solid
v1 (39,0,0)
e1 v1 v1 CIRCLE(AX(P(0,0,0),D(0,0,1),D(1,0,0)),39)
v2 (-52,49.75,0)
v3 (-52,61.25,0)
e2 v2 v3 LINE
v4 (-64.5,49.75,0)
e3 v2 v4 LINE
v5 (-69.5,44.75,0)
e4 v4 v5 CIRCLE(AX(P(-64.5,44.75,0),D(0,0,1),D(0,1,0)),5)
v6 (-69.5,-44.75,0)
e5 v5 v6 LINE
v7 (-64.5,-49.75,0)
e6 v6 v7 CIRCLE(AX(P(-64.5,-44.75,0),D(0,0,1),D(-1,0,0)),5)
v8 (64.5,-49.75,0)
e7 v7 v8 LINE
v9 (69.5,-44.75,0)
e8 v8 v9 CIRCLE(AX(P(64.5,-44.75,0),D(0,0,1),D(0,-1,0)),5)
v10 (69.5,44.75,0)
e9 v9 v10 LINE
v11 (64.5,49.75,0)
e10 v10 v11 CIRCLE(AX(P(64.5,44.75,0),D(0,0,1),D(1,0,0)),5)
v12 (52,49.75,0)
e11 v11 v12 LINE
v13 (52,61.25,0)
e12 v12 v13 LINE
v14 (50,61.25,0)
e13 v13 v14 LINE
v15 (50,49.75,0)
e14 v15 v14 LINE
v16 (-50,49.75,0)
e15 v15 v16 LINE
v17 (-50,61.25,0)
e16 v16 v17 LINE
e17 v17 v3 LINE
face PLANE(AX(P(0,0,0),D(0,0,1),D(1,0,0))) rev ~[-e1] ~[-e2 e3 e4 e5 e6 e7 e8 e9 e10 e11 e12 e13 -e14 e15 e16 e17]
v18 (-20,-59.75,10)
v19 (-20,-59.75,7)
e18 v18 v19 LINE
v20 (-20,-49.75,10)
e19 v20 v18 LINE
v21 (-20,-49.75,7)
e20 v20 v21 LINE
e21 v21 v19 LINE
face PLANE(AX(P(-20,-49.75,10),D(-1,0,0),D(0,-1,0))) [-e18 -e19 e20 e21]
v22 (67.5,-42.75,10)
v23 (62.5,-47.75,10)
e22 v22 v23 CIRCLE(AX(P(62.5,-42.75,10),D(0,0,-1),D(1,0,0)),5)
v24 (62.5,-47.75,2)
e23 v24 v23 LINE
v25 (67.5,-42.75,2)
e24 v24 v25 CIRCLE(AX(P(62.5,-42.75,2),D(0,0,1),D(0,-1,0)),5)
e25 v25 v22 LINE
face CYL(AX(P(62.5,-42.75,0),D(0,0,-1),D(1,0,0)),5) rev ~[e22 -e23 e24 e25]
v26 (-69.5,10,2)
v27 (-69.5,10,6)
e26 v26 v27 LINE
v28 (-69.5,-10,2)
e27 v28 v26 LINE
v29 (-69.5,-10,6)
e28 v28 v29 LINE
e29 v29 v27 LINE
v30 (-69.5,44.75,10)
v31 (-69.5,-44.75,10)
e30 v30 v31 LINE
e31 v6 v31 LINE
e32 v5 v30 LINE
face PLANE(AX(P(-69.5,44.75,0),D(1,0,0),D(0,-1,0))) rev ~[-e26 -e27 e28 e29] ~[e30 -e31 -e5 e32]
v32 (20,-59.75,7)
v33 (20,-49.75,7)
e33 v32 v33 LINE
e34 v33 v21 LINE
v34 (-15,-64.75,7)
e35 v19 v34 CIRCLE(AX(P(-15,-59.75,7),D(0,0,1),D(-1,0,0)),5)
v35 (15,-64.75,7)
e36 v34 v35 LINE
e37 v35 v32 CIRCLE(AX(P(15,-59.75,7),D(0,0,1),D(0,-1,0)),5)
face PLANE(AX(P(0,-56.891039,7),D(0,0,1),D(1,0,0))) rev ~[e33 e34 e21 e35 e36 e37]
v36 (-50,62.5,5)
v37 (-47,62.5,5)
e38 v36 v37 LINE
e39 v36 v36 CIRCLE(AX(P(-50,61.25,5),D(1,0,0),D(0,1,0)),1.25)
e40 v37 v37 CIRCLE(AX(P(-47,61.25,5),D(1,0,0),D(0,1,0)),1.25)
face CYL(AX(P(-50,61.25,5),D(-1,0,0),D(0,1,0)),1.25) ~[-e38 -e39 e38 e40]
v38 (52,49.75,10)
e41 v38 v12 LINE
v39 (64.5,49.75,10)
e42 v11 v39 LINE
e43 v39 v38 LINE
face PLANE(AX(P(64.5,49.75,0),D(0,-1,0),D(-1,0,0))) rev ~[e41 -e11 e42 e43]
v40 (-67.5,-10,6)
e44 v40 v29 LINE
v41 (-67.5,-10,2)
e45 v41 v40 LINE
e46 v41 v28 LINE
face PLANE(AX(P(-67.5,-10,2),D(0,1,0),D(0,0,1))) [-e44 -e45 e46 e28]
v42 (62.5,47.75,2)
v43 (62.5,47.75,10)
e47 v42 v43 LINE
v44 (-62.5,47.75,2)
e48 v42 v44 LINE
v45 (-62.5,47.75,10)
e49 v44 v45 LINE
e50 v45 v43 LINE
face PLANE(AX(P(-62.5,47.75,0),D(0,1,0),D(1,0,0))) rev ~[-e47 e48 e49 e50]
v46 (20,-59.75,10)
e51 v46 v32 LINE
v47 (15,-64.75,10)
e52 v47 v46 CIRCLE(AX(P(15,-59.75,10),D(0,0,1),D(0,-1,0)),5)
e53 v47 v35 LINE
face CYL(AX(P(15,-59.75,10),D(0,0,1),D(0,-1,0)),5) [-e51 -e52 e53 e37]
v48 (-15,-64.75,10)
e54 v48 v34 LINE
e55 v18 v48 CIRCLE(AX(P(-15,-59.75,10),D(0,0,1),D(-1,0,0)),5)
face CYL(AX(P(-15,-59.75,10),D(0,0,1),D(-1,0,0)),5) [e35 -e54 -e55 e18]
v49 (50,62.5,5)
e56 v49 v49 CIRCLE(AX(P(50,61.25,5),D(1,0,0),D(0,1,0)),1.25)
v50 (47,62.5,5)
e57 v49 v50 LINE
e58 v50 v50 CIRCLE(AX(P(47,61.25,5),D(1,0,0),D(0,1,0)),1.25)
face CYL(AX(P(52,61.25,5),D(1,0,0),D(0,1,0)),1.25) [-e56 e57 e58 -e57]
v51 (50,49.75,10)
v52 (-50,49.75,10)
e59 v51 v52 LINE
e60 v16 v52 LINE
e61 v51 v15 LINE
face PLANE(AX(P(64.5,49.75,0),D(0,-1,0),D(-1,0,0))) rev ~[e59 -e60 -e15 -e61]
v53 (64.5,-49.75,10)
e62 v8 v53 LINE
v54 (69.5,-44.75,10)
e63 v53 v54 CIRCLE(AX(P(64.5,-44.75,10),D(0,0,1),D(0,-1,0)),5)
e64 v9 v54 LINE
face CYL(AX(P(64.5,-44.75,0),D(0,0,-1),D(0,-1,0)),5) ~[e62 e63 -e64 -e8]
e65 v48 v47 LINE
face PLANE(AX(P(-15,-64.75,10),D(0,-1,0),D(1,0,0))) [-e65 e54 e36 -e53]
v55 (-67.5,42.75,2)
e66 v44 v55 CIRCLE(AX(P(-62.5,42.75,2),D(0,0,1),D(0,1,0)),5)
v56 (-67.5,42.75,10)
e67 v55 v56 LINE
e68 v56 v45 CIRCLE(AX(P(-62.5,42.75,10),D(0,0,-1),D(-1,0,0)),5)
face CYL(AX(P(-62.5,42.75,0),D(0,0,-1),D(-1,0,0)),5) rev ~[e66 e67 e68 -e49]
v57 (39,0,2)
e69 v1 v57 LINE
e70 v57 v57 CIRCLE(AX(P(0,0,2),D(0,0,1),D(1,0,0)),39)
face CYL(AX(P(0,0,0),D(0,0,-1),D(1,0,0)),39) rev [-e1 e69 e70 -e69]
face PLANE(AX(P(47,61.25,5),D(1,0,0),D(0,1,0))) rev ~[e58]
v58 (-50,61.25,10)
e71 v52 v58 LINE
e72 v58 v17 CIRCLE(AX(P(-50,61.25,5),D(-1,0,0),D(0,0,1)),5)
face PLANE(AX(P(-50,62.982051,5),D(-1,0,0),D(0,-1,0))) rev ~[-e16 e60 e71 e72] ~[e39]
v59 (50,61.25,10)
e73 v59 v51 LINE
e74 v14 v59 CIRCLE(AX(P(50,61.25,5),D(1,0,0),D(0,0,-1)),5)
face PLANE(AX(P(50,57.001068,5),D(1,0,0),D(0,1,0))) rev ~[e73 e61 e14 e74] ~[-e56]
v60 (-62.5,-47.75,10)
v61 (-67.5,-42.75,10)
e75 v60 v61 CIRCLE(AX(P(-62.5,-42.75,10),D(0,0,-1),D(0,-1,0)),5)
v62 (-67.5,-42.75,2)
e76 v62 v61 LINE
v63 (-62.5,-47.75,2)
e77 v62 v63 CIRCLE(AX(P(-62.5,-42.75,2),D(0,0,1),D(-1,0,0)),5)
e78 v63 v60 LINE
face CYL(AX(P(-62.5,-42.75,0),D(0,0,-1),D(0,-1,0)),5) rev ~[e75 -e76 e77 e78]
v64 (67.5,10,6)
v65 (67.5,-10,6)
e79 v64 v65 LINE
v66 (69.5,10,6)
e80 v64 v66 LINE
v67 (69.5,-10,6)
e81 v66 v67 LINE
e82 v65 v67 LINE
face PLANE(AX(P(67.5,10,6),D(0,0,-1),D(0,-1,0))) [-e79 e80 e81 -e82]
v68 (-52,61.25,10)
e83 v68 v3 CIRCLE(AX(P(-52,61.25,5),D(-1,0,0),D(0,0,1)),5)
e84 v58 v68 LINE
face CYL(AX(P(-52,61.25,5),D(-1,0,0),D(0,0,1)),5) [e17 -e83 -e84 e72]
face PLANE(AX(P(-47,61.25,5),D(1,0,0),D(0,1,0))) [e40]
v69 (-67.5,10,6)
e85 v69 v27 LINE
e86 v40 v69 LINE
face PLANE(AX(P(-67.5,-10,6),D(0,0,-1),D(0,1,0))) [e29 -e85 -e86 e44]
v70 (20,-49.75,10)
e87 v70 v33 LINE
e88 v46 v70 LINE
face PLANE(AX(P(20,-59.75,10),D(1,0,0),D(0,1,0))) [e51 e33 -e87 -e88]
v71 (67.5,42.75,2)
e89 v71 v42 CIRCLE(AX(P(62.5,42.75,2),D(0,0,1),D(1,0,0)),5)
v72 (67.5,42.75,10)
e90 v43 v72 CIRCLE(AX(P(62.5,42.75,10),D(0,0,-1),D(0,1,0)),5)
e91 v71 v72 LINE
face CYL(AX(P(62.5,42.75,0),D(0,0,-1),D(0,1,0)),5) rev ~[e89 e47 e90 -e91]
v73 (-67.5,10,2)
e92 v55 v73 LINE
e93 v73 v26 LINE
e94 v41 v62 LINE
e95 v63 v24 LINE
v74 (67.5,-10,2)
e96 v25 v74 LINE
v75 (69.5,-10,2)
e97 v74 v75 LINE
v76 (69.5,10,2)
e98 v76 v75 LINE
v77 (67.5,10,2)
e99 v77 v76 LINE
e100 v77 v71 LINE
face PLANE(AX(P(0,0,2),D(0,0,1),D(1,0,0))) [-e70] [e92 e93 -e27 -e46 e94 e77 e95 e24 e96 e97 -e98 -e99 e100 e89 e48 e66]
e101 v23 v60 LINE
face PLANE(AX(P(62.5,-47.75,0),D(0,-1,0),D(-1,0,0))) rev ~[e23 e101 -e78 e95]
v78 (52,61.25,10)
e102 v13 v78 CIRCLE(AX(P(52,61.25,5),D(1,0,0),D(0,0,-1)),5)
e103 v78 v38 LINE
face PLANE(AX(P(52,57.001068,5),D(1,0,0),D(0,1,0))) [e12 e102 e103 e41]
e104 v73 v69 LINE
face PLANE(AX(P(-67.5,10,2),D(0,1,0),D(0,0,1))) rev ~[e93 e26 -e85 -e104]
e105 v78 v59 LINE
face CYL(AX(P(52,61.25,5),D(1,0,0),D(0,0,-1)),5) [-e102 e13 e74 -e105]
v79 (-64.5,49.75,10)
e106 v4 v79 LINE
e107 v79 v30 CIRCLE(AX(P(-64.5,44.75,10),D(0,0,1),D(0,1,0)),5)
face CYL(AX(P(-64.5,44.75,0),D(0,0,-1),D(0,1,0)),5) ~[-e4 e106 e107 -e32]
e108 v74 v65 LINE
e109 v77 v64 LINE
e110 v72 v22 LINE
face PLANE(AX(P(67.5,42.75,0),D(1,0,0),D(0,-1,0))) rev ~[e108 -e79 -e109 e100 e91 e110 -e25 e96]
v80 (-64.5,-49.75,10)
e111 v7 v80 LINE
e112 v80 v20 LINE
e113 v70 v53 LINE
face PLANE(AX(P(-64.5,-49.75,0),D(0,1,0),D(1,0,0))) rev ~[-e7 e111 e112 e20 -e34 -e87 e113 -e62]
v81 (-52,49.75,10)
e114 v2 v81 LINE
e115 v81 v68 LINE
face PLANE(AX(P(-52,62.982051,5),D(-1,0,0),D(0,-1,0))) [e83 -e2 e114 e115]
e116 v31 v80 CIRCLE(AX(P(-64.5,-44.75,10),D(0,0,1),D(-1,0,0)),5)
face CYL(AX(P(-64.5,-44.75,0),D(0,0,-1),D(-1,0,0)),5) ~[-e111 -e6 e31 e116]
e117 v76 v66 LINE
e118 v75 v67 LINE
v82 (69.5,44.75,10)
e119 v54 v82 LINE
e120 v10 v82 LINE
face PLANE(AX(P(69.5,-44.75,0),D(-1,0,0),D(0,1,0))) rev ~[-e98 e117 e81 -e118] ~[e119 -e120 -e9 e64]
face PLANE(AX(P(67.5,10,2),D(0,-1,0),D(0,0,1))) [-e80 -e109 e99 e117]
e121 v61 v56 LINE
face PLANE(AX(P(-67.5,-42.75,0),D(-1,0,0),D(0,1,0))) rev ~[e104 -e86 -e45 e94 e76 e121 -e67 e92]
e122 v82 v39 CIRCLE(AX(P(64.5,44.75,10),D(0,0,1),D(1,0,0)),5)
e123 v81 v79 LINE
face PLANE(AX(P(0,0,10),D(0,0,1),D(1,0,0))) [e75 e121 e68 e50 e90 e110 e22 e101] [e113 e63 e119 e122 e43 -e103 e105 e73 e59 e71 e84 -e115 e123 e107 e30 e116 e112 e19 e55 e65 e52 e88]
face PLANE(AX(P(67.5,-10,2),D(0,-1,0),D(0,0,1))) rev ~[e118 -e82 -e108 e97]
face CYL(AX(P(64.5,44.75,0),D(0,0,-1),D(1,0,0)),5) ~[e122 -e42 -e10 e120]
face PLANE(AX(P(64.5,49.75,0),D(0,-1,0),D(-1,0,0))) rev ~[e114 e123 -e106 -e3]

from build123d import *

# Parameters (mm, degrees)
F1_DEPTH  = 10
F0_R      = 39
F2_DEPTH  = 2
F4_DEPTH  = 3
F5_W      = 20
F5_H      = 4
F6_DEPTH  = 2
F7_W      = 20
F7_H      = 4
F8_DEPTH  = 2
F9_W      = 2
F9_H      = 10
F10_DEPTH = 11.5
F12_DEPTH = 2
F13_R     = 1.25
F14_DEPTH = 3
F16_R     = 1.25
F17_DEPTH = 2
F18_DEPTH = 5


# Not quite as in the source:
# - a feature names something its author has since deleted; it is built from what else it names


with BuildPart() as f1:
    # F0 (on Top) → F1 (new body)
    with BuildSketch(Plane.XY):
        with BuildLine():
            ThreePointArc((69.5, 44.75), (68.0355339059, 48.2855339059), (64.5, 49.75))
            Line((64.5, 49.75), (-64.5, 49.75))
            ThreePointArc((-64.5, 49.75), (-68.0355339059, 48.2855339059), (-69.5, 44.75))
            Line((-69.5, 44.75), (-69.5, -44.75))
            ThreePointArc((-69.5, -44.75), (-68.0355339059, -48.2855339059), (-64.5, -49.75))
            Line((-64.5, -49.75), (64.5, -49.75))
            ThreePointArc((64.5, -49.75), (68.0355339059, -48.2855339059), (69.5, -44.75))
            Line((69.5, -44.75), (69.5, 44.75))
        make_face()
        with BuildLine():
            Line((-62.5, 47.75), (62.5, 47.75))
            ThreePointArc((62.5, 47.75), (66.0355339059, 46.2855339059), (67.5, 42.75))
            Line((67.5, 42.75), (67.5, -42.75))
            ThreePointArc((67.5, -42.75), (66.0355339059, -46.2855339059), (62.5, -47.75))
            Line((62.5, -47.75), (-62.5, -47.75))
            ThreePointArc((-62.5, -47.75), (-66.0355339059, -46.2855339059), (-67.5, -42.75))
            Line((-67.5, -42.75), (-67.5, 42.75))
            ThreePointArc((-67.5, 42.75), (-66.0355339059, 46.2855339059), (-62.5, 47.75))
        make_face(mode=Mode.SUBTRACT)
    extrude(amount=F1_DEPTH)

    # F0 (on Top) → F2 (join)
    with BuildSketch(Plane.XY):
        with BuildLine():
            ThreePointArc((67.5, 42.75), (66.0355339059, 46.2855339059), (62.5, 47.75))
            Line((62.5, 47.75), (-62.5, 47.75))
            ThreePointArc((-62.5, 47.75), (-66.0355339059, 46.2855339059), (-67.5, 42.75))
            Line((-67.5, 42.75), (-67.5, -42.75))
            ThreePointArc((-67.5, -42.75), (-66.0355339059, -46.2855339059), (-62.5, -47.75))
            Line((-62.5, -47.75), (62.5, -47.75))
            ThreePointArc((62.5, -47.75), (66.0355339059, -46.2855339059), (67.5, -42.75))
            Line((67.5, -42.75), (67.5, 42.75))
        make_face()
        Circle(F0_R, mode=Mode.SUBTRACT)
    extrude(amount=F2_DEPTH)

    # F3 (on face) → F4 (join)
    with BuildSketch(Plane.XY.offset(10)):
        with BuildLine():
            Line((20, -49.75), (-20, -49.75))
            Line((-20, -49.75), (-20, -59.75))
            ThreePointArc((-20, -59.75), (-18.5355339059, -63.2855339059), (-15, -64.75))
            Line((-15, -64.75), (15, -64.75))
            ThreePointArc((15, -64.75), (18.5355339059, -63.2855339059), (20, -59.75))
            Line((20, -59.75), (20, -49.75))
        make_face()
    extrude(amount=-F4_DEPTH)

    # F5 (on face) → F6 (cut, through all)
    with BuildSketch(Plane.YZ.offset(-67.5)):
        with Locations((0, 4)):
            Rectangle(F5_W, F5_H)
    extrude(amount=-F6_DEPTH, mode=Mode.SUBTRACT)

    # F7 (on face) → F8 (cut, through all)
    with BuildSketch(Plane(origin=(67.5, 0, 0), x_dir=(0, -1, 0), z_dir=(-1, 0, 0))):
        with Locations((0, 4)):
            Rectangle(F7_W, F7_H)
    extrude(amount=-F8_DEPTH, mode=Mode.SUBTRACT)

    # F9 (on face) → F10 (join)
    with BuildSketch(Plane(origin=(0, 49.75, 0), x_dir=(-1, 0, 0), z_dir=(0, 1, 0))):
        with Locations((51, 5)):
            Rectangle(F9_W, F9_H)
    extrude(amount=F10_DEPTH)

    # F11 (on face) → F12 (join)
    with BuildSketch(Plane(origin=(-52, 0, 0), x_dir=(0, -1, 0), z_dir=(-1, 0, 0))):
        with BuildLine():
            Line((-61.25, 0), (-61.25, 10))
            ThreePointArc((-61.25, 10), (-66.25, 5), (-61.25, 0))
        make_face()
    extrude(amount=-F12_DEPTH)

    # F13 (on face) → F14 (join)
    with BuildSketch(Plane.YZ.offset(-50)):
        with Locations((61.25, 5)):
            Circle(F13_R)
    extrude(amount=F14_DEPTH)

    # F16 (on offset) → F17 (join)
    with BuildSketch(Plane.YZ.offset(52)):
        with BuildLine():
            Line((61.25, 10), (49.75, 10))
            Line((49.75, 10), (49.75, 0))
            Line((49.75, 0), (61.25, 0))
            ThreePointArc((61.25, 0), (66.25, 5), (61.25, 10))
        make_face()
        with Locations((61.25, 5)):
            Circle(F16_R, mode=Mode.SUBTRACT)
    extrude(amount=-F17_DEPTH)

    # F16 (on offset) → F18 (join)
    with BuildSketch(Plane.YZ.offset(52)):
        with Locations((61.25, 5)):
            Circle(F16_R)
    extrude(amount=-F18_DEPTH)


solid = f1.part
